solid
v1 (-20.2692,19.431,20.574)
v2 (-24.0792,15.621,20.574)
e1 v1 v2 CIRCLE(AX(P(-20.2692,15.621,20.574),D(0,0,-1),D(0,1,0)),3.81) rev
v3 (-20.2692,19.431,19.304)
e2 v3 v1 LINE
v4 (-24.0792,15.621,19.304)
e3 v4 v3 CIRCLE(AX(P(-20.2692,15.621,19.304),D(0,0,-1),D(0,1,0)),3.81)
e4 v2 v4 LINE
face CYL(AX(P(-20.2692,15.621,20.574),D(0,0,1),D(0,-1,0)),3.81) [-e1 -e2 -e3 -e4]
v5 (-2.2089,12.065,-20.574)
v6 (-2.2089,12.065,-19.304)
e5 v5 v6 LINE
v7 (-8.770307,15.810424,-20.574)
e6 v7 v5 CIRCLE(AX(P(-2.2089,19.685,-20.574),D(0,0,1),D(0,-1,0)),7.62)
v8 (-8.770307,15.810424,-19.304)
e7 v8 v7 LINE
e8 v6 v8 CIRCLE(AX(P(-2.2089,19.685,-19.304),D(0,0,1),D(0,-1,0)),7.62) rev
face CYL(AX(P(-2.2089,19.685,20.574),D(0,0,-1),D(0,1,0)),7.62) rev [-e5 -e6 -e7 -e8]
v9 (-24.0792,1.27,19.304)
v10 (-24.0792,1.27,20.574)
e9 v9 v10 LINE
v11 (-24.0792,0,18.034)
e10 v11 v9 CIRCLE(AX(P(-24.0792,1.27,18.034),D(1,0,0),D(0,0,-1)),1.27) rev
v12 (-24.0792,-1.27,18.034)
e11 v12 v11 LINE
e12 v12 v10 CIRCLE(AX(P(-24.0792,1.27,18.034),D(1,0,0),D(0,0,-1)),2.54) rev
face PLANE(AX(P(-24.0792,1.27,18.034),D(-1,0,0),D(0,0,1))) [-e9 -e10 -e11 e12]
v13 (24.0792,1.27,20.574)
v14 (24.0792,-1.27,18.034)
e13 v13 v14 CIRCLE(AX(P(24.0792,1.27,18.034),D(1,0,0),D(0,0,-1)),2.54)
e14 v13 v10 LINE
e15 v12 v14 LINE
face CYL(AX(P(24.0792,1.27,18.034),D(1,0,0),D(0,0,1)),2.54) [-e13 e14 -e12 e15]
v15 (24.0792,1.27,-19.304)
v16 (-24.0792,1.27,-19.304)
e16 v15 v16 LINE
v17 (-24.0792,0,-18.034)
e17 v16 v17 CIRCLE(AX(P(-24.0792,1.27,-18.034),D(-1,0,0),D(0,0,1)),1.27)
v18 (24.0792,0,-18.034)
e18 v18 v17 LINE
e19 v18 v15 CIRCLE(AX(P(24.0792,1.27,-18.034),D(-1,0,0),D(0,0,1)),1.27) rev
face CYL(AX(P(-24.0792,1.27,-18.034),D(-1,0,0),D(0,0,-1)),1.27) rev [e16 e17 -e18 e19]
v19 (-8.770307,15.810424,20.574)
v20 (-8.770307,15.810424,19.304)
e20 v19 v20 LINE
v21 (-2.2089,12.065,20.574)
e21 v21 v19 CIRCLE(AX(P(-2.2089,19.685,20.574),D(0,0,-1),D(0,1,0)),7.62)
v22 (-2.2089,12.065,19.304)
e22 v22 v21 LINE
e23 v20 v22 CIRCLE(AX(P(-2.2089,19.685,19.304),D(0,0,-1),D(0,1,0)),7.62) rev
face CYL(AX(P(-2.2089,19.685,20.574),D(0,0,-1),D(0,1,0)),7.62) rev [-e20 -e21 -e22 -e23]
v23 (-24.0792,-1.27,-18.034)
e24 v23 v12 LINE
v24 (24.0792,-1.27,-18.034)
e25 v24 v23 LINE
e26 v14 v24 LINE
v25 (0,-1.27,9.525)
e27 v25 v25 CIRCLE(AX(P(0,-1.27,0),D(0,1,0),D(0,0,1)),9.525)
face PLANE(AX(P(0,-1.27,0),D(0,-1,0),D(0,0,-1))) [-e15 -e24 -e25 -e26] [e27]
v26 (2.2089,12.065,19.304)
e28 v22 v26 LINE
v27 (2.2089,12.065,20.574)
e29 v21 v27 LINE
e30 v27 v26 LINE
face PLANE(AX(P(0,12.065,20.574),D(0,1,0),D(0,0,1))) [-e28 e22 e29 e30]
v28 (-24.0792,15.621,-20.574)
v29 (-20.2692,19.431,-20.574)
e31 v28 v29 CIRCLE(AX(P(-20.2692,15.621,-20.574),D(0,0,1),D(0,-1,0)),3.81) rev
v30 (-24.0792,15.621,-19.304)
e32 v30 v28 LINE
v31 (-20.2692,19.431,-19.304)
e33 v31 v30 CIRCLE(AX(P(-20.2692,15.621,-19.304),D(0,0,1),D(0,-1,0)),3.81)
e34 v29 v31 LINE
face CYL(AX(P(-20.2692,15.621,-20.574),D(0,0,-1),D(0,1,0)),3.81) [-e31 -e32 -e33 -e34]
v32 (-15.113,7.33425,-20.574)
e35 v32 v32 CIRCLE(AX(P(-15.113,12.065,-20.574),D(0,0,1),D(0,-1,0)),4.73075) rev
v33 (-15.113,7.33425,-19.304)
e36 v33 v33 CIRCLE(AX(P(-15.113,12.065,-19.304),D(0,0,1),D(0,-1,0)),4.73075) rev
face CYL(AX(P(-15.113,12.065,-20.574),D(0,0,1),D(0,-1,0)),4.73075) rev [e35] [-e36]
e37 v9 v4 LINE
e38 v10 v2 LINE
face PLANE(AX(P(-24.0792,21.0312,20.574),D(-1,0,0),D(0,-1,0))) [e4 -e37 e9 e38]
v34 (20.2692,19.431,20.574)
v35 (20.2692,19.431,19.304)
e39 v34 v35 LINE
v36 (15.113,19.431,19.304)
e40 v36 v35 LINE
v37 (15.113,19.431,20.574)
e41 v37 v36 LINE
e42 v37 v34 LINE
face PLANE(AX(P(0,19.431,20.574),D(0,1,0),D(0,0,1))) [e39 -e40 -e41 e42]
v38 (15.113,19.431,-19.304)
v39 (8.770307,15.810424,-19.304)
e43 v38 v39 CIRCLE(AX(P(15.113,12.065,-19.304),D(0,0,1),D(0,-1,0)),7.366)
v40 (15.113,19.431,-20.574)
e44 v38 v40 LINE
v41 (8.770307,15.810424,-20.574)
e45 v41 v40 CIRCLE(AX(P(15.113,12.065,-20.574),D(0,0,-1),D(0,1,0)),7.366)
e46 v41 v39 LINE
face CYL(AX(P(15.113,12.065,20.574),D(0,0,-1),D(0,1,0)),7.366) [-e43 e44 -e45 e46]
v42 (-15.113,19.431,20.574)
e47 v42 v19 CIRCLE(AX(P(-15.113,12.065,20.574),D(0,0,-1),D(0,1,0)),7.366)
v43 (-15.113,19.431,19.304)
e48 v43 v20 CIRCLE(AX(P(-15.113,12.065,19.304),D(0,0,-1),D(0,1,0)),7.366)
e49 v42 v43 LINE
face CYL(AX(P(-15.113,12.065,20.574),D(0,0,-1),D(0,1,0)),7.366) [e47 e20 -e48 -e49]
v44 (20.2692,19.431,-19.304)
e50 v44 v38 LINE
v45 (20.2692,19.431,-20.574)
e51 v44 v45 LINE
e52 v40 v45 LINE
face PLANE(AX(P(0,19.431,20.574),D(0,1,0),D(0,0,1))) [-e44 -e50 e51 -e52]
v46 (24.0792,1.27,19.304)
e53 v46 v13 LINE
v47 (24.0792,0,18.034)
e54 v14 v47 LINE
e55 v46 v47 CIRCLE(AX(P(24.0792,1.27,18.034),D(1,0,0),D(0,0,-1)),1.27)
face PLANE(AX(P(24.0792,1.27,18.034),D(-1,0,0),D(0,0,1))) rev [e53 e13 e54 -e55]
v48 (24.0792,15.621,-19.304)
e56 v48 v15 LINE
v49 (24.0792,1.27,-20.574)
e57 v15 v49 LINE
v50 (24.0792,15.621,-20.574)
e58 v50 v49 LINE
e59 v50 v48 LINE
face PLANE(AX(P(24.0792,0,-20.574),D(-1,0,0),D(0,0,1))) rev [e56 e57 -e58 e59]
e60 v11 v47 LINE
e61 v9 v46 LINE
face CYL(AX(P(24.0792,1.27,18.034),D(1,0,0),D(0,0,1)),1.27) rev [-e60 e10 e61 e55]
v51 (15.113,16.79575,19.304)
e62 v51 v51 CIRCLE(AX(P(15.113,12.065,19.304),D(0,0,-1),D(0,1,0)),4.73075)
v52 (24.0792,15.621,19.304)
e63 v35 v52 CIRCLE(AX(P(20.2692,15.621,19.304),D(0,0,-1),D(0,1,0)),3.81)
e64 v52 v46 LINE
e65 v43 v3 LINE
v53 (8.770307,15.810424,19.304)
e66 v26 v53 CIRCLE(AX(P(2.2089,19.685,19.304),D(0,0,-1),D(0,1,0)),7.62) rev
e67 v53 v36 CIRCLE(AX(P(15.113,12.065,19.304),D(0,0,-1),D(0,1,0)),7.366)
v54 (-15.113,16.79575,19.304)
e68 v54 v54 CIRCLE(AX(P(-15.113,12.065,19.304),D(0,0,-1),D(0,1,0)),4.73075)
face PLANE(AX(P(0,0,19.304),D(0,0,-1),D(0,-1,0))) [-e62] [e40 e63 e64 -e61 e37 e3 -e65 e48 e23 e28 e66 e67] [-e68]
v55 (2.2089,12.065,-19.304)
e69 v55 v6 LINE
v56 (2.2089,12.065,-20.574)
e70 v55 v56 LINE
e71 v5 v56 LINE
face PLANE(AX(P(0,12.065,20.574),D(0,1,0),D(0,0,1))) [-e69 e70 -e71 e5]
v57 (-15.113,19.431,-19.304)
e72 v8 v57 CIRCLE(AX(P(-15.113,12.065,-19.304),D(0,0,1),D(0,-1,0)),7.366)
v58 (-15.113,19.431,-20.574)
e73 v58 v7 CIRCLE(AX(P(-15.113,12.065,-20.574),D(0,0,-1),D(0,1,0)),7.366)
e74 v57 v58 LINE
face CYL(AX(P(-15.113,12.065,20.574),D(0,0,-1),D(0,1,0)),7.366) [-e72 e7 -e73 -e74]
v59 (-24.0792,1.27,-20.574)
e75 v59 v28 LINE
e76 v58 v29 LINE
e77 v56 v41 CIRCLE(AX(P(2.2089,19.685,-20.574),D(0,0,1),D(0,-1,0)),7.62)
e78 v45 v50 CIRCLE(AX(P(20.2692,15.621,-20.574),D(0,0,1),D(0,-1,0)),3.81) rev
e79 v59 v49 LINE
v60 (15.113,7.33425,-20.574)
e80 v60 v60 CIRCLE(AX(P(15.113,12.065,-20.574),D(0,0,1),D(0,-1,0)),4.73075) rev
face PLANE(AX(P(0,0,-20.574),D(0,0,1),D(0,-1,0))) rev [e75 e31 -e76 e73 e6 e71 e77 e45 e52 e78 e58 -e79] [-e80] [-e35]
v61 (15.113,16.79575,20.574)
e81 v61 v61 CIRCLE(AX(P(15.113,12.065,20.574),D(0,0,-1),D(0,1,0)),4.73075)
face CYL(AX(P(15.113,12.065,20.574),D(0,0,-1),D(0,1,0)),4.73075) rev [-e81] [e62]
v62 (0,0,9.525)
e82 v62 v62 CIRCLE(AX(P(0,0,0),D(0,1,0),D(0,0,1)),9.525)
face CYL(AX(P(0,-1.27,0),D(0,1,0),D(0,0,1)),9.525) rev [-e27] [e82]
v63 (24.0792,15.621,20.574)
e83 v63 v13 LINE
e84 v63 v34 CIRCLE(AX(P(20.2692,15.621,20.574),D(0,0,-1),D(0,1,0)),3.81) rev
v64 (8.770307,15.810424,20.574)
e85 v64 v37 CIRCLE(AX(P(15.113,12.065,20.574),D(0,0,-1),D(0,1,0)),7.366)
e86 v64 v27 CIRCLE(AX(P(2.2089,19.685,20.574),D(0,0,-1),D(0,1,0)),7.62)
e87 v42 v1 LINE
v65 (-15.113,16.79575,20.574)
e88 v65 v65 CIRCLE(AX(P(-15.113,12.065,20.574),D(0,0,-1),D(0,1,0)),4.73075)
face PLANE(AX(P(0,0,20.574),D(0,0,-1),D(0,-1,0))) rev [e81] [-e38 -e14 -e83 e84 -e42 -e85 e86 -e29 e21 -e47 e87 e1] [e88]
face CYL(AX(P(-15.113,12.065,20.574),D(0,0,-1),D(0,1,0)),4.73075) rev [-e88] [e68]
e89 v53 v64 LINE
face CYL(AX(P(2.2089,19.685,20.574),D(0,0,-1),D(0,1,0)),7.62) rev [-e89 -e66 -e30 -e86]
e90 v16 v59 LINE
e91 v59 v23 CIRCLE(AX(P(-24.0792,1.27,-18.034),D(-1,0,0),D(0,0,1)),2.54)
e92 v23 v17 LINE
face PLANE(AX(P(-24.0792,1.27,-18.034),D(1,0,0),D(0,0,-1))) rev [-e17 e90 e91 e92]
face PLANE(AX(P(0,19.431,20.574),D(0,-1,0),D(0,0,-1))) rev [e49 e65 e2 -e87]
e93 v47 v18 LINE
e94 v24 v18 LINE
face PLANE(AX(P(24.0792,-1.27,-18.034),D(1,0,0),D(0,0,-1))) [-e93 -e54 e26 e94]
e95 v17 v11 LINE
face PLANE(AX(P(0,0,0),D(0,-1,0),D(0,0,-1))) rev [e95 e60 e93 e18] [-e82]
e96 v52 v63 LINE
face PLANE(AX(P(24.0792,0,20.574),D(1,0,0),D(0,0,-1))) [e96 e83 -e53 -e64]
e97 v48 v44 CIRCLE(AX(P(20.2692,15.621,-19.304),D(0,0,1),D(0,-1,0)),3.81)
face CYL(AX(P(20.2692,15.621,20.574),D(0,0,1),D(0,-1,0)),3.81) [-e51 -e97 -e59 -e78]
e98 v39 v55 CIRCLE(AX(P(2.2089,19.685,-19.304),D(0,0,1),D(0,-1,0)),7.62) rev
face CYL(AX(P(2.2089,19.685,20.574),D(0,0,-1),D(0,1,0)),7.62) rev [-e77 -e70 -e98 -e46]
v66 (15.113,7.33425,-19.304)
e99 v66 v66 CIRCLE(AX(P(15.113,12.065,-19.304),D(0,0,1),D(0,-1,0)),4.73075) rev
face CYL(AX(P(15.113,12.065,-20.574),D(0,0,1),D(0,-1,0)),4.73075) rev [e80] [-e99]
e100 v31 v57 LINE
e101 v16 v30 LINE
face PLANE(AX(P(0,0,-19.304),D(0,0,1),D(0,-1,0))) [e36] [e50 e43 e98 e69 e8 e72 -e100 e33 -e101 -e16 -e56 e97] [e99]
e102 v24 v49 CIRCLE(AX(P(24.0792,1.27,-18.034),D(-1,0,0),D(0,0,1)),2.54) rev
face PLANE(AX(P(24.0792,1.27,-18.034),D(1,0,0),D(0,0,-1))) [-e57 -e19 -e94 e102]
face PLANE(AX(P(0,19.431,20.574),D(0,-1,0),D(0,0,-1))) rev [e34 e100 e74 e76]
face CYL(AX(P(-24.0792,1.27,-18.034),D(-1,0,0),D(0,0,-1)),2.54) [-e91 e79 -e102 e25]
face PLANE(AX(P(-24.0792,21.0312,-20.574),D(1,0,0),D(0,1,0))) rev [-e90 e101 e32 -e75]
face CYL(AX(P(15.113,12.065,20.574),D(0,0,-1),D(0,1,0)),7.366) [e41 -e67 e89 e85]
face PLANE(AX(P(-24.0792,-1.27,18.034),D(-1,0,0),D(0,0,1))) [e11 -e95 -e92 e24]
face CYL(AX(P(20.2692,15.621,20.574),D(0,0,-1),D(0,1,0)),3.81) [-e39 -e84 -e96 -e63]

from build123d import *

# Parameters (mm, degrees)
SKETCH1_W               = 48.1584
SKETCH1_H               = 36.068
SKETCH1_R               = 9.525
BASE_FLANGE1_DEPTH      = 1.27
EDGE_FLANGE1_DEPTH      = 48.1584
EDGE_FLANGE1_START      = 1.27
EDGE_FLANGE1_PROFILE_W  = 48.1584
EDGE_FLANGE1_PROFILE_H  = 19.7612
EDGE_FLANGE1_PROFILE_R  = 4.73075
EDGE_FLANGE1_FLAT_DEPTH = 1.27
CUT_EXTRUDE7_DEPTH      = 53.108321313
FILLET2_R               = 7.62
FILLET3_R               = 3.81


# Sheet-metal steps are written as plain solids
with BuildPart() as part:
    # Sketch1 → Base-Flange1 (new body)
    with BuildSketch(Plane(origin=(0, 0, 0), x_dir=(1, 0, 0), z_dir=(0, 1, 0))):
        Rectangle(SKETCH1_W, SKETCH1_H)
        with Locations(Location((0, 0, 0), (0, 0, 270))):
            Circle(SKETCH1_R, mode=Mode.SUBTRACT)
    extrude(amount=-BASE_FLANGE1_DEPTH)

    # Edge-Flange1 bend section (across the edge) → Edge-Flange1 (add)
    with BuildSketch(Plane(origin=(24.0792, 0, -19.304), x_dir=(0, 0, 1), z_dir=(-1, 0, 0))):
        with BuildLine():
            Line((-1.27, 1.27), (0, 1.27))
            ThreePointArc((0, 1.27), (0.371974388, 0.371974388), (1.27, 0))
            Line((1.27, 0), (1.27, -1.27))
            ThreePointArc((1.27, -1.27), (-0.526051224, -0.526051224), (-1.27, 1.27))
        make_face()
    edge_flange1 = extrude(amount=EDGE_FLANGE1_DEPTH)

    # Edge-Flange1 profile (on flange) → Edge-Flange1 flat (add)
    with BuildSketch(Plane(origin=(0, 0, -19.304), x_dir=(-1, 0, 0), z_dir=(0, 0, -1)).offset(EDGE_FLANGE1_START)):
        with Locations((0, 11.1506)):
            Rectangle(EDGE_FLANGE1_PROFILE_W, EDGE_FLANGE1_PROFILE_H)
        with Locations((-15.113, 12.065)):
            Circle(EDGE_FLANGE1_PROFILE_R, mode=Mode.SUBTRACT)
        with Locations((15.113, 12.065)):
            Circle(EDGE_FLANGE1_PROFILE_R, mode=Mode.SUBTRACT)
    edge_flange1_flat = extrude(amount=-EDGE_FLANGE1_FLAT_DEPTH)

    # Mirror1: Edge-Flange1, Edge-Flange1 flat across plane
    add(edge_flange1.mirror(Plane.XY))
    add(edge_flange1_flat.mirror(Plane.XY))

    # Sketch11 → Cut-Extrude7 (cut, through all)
    with BuildSketch(Plane(origin=(0, 0, -20.574), x_dir=(-1, 0, 0), z_dir=(0, 0, -1))):
        with BuildLine():
            Line((24.0792, 19.431), (24.0792, 21.0312))
            Line((24.0792, 21.0312), (-24.0792, 21.0312))
            Line((-24.0792, 21.0312), (-24.0792, 19.431))
            Line((-24.0792, 19.431), (-15.113, 19.431))
            ThreePointArc((-15.113, 19.431), (-9.90445145, 17.27354855), (-7.747, 12.065))
            Line((-7.747, 12.065), (7.747, 12.065))
            ThreePointArc((7.747, 12.065), (9.90445145, 17.27354855), (15.113, 19.431))
            Line((15.113, 19.431), (24.0792, 19.431))
        make_face()
    extrude(amount=-CUT_EXTRUDE7_DEPTH, mode=Mode.SUBTRACT)

    # Fillet2
    fillet2_edges = [part.edges().sort_by_distance(p)[0] for p in [
        (7.747, 12.065, -19.939),
        (-7.747, 12.065, -19.939),
        (7.747, 12.065, 19.939),
        (-7.747, 12.065, 19.939),
    ]]
    fillet(fillet2_edges, radius=FILLET2_R)

    # Fillet3
    fillet3_edges = [part.edges().sort_by_distance(p)[0] for p in [
        (-24.0792, 19.431, -19.939),
        (24.0792, 19.431, -19.939),
        (24.0792, 19.431, 19.939),
        (-24.0792, 19.431, 19.939),
    ]]
    fillet(fillet3_edges, radius=FILLET3_R)


solid = part.part
